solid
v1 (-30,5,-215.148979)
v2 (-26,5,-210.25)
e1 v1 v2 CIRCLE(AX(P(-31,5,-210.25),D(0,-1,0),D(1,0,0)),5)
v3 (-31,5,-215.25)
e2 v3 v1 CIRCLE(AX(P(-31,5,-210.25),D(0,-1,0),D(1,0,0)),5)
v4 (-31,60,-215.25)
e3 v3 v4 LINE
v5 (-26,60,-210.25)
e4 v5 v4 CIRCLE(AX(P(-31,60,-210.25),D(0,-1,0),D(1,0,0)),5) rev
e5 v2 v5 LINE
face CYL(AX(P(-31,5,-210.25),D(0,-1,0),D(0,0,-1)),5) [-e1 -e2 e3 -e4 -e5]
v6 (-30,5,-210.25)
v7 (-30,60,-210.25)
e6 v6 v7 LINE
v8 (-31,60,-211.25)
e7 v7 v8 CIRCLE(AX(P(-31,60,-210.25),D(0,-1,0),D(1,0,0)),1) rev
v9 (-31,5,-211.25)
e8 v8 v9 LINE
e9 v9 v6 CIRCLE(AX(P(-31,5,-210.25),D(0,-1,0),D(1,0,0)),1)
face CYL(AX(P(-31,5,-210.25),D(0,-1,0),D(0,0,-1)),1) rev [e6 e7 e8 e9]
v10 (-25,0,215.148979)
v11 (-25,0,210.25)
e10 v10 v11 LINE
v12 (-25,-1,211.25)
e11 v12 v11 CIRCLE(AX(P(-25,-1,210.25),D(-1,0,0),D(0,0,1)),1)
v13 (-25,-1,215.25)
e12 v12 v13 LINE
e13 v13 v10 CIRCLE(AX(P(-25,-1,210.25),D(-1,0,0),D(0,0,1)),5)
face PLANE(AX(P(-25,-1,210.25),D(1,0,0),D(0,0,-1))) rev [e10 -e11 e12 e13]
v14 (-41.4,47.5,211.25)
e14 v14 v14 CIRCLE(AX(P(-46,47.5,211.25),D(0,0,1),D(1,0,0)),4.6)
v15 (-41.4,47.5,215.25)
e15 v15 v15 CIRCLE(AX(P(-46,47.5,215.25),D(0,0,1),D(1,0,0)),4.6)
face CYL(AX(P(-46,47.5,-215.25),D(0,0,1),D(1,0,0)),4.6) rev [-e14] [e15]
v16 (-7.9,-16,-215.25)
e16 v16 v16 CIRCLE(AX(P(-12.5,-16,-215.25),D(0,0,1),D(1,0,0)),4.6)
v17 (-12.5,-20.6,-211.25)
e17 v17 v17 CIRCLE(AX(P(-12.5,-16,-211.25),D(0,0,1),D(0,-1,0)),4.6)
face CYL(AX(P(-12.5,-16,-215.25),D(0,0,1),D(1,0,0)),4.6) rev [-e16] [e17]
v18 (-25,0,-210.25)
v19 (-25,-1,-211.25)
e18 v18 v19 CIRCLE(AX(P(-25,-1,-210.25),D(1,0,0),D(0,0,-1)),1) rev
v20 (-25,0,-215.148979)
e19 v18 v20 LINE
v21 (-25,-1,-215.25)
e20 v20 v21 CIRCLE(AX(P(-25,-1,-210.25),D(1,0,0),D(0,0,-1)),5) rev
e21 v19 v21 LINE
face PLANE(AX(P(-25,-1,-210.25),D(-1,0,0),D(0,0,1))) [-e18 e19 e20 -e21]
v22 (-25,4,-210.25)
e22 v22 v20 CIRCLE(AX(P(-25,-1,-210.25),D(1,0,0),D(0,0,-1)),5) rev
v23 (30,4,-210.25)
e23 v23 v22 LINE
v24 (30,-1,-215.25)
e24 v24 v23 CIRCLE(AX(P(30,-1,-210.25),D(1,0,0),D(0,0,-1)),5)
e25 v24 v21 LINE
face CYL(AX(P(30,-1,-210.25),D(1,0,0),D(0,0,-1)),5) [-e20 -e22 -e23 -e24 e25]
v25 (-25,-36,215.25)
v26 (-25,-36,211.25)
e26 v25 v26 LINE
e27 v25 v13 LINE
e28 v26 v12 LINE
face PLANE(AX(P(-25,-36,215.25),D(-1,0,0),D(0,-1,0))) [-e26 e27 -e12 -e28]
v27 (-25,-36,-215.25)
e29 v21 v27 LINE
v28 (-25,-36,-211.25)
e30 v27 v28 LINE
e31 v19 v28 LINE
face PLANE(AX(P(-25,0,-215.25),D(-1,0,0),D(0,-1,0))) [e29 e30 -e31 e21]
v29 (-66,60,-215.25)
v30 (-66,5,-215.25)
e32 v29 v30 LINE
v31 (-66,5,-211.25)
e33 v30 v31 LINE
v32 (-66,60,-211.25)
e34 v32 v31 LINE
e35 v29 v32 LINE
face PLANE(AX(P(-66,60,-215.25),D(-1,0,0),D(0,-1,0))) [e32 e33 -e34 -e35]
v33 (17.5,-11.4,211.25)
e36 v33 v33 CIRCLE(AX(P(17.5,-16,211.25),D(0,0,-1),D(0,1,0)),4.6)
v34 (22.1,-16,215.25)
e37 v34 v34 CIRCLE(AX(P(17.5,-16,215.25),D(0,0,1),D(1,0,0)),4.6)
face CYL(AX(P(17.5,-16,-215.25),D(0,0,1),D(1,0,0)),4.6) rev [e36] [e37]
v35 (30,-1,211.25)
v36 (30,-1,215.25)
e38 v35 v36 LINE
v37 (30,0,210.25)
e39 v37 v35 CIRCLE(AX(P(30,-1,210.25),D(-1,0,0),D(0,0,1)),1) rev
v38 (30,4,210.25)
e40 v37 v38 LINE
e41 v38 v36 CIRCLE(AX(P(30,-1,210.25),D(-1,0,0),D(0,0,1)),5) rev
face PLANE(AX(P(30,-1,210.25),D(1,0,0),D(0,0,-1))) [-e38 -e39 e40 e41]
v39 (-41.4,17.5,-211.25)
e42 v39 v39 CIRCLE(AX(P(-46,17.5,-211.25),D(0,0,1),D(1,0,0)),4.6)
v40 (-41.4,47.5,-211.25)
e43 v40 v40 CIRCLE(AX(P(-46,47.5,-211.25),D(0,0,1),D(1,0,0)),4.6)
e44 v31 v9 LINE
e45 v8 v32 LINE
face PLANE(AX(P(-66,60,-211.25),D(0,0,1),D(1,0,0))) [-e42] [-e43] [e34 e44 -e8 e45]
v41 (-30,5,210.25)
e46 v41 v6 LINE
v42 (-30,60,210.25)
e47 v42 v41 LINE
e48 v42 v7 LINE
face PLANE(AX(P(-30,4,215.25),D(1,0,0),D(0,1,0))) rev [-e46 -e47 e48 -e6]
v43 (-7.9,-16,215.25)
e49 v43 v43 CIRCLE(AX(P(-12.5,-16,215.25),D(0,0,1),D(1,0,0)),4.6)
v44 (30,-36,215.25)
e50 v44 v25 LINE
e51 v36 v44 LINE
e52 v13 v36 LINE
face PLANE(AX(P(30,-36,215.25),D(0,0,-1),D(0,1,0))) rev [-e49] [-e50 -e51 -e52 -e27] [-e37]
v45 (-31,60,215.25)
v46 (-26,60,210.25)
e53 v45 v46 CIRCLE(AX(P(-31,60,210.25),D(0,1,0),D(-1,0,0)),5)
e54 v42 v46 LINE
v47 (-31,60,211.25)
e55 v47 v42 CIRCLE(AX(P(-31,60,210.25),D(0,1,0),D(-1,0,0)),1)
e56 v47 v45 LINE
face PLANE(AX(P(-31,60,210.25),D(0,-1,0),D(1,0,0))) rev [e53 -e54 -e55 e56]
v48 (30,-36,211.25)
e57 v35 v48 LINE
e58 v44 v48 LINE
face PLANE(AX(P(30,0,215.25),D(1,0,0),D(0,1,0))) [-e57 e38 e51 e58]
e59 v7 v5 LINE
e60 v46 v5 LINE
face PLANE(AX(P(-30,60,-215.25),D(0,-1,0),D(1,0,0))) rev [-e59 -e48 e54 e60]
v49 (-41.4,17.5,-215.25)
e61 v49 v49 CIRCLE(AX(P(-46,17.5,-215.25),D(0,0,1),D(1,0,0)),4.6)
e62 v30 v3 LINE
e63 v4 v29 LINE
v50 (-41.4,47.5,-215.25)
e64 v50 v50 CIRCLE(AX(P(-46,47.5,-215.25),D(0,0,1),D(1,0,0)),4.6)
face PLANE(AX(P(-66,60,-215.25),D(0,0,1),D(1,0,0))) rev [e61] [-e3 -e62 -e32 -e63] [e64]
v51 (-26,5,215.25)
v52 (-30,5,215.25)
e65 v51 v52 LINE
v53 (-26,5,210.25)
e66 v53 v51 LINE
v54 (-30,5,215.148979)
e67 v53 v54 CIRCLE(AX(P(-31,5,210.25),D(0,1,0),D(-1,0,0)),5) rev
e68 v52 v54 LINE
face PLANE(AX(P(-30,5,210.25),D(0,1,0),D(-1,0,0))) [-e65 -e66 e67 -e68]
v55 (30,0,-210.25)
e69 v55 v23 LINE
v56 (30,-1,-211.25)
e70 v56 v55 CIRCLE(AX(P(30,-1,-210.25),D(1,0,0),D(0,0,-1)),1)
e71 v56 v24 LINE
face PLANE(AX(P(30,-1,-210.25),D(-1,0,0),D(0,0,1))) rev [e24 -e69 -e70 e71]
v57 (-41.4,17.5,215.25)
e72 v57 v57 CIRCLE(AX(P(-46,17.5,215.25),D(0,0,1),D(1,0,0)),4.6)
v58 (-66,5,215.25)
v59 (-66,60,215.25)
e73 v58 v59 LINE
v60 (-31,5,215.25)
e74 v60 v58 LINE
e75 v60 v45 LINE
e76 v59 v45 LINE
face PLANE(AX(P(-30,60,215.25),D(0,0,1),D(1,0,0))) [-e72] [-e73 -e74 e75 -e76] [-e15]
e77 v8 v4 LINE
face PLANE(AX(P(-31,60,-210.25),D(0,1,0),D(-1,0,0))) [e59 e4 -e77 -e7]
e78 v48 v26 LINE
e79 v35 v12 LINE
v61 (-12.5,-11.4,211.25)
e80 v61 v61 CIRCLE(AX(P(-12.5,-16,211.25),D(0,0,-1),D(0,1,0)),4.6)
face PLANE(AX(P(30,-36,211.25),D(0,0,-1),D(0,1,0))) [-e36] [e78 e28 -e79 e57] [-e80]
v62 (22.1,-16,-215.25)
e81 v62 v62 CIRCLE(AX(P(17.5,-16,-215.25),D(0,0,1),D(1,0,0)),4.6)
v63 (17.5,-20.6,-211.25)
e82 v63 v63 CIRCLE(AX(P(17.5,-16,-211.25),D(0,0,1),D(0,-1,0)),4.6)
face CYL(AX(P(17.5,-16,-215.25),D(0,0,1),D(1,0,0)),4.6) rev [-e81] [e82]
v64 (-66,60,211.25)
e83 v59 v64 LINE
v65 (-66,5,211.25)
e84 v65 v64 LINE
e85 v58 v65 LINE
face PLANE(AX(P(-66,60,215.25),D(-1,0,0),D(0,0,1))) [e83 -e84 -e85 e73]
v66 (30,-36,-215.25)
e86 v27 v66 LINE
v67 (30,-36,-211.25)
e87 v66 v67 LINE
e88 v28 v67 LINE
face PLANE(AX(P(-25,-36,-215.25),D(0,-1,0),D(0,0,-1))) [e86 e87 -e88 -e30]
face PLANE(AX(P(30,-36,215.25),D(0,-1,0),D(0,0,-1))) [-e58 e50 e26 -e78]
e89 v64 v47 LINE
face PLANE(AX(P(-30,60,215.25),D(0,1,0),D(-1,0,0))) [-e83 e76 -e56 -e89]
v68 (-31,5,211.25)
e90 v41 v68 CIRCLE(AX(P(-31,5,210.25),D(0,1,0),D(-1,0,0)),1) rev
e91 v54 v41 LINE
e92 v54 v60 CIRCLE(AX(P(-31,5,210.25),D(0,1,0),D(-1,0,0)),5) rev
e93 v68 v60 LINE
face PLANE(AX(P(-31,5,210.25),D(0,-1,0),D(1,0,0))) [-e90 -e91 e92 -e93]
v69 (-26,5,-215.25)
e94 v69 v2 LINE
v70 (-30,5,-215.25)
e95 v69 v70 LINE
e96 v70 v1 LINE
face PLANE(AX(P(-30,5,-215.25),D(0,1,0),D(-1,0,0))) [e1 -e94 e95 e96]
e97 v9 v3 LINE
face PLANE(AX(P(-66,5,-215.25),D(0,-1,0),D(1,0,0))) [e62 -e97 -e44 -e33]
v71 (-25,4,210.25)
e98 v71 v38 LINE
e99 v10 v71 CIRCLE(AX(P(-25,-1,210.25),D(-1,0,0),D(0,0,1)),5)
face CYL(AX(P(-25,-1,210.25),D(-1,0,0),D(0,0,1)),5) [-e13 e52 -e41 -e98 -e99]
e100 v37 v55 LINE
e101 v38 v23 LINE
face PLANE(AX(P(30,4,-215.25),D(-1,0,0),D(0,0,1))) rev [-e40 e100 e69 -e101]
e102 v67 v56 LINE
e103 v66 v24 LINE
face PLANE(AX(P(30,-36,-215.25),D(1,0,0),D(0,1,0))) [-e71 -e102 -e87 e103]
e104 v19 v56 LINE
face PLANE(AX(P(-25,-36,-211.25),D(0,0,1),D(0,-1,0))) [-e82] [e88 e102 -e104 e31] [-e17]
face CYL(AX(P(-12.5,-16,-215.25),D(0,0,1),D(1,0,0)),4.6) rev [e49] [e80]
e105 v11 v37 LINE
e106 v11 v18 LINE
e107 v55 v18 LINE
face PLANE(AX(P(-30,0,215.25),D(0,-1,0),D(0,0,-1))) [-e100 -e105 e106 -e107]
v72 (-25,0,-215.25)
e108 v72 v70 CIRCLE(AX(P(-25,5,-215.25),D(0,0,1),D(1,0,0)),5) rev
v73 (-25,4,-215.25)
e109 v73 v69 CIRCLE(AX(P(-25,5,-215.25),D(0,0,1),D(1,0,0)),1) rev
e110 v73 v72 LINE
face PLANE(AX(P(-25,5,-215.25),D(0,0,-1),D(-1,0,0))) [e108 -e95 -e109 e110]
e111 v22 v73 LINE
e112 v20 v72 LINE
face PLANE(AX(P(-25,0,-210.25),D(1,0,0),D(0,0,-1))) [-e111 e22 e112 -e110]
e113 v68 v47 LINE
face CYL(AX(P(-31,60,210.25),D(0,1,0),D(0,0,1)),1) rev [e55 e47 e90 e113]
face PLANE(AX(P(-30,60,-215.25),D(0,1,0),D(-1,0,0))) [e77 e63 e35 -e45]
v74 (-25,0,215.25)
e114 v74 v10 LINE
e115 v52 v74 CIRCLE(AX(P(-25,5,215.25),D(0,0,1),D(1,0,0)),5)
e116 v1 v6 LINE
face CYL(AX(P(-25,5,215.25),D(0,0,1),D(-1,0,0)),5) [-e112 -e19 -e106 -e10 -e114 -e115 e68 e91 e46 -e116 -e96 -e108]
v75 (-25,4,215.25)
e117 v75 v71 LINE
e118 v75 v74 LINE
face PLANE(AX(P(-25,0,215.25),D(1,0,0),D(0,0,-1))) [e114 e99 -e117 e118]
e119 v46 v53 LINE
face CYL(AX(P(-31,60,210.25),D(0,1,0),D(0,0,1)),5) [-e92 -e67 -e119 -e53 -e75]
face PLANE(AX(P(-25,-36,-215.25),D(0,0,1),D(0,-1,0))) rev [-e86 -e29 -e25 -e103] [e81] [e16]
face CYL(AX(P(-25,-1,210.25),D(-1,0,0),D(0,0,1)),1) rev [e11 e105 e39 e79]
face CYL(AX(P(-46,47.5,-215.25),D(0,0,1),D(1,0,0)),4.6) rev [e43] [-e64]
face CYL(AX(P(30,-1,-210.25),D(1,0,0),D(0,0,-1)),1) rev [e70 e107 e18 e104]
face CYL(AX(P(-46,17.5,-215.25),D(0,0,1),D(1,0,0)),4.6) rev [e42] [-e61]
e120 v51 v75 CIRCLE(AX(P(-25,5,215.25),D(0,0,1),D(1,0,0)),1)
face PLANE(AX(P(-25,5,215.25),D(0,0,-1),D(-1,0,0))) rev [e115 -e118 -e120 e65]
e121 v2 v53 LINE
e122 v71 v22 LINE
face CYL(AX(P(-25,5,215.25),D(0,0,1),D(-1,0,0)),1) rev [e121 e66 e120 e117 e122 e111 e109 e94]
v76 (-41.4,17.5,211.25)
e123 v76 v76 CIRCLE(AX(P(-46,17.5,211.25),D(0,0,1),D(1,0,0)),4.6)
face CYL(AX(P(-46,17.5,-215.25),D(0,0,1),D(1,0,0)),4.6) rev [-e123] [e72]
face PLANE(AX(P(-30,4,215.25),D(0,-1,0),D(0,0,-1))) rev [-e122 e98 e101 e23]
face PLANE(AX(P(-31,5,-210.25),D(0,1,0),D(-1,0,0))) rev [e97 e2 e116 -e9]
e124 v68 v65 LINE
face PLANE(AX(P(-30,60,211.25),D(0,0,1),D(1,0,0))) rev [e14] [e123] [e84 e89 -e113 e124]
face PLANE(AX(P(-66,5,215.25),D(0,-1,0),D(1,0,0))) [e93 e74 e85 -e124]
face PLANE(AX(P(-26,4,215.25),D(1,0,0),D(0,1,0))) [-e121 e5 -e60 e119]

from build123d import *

# Parameters (mm, degrees)
SKETCH1_W                      = 60
SKETCH1_H                      = 430.5
BASE_FLANGE1_DEPTH             = 4
EDGE_FLANGE1_STRIP_W           = 18
EDGE_FLANGE1_STRIP_H           = 4
EDGE_FLANGE1_STRIP_CUT_DEPTH   = 430.5
EDGE_FLANGE1_DEPTH             = 430.5
EDGE_FLANGE2_STRIP_W           = 18
EDGE_FLANGE2_STRIP_H           = 4
EDGE_FLANGE2_STRIP_CUT_DEPTH   = 55
EDGE_FLANGE2_STRIP_2_W         = 18
EDGE_FLANGE2_STRIP_2_H         = 4
EDGE_FLANGE2_STRIP_CUT_2_DEPTH = 55
EDGE_FLANGE2_STRIP_3_W         = 18
EDGE_FLANGE2_STRIP_3_H         = 4
EDGE_FLANGE2_STRIP_CUT_3_DEPTH = 55
EDGE_FLANGE2_STRIP_4_W         = 18
EDGE_FLANGE2_STRIP_4_H         = 4
EDGE_FLANGE2_STRIP_CUT_4_DEPTH = 55
EDGE_FLANGE2_DEPTH             = 55
EDGE_FLANGE2_BEND_DEPTH        = 55
EDGE_FLANGE2_BEND_2_DEPTH      = 55
EDGE_FLANGE2_BEND_3_DEPTH      = 55
SKETCH18_R                     = 4.6
EXTRUDE1_DEPTH                 = 440.643321341


# Sheet-metal steps are written as plain solids
with BuildPart() as part:
    # Sketch1 → Base-Flange1 (new body)
    with BuildSketch(Plane(origin=(0, 0, 0), x_dir=(1, 0, 0), z_dir=(0, 1, 0))):
        Rectangle(SKETCH1_W, SKETCH1_H)
    extrude(amount=BASE_FLANGE1_DEPTH)

    # Edge-Flange1 strip (across the edge) → Edge-Flange1 strip cut (cut)
    with BuildSketch(Plane(origin=(-30, 4, -215.25), x_dir=(1, 0, 0), z_dir=(0, 0, 1))):
        with Locations((-4, -2)):
            Rectangle(EDGE_FLANGE1_STRIP_W, EDGE_FLANGE1_STRIP_H)
    extrude(amount=EDGE_FLANGE1_STRIP_CUT_DEPTH, mode=Mode.SUBTRACT)

    # Edge-Flange1 section (across the edge) → Edge-Flange1 (add)
    with BuildSketch(Plane(origin=(-30, 4, -215.25), x_dir=(1, 0, 0), z_dir=(0, 0, 1))):
        with BuildLine():
            Line((0, 1), (0, 56))
            Line((0, 56), (4, 56))
            Line((4, 56), (4, 1))
            ThreePointArc((4, 1), (4.292893219, 0.292893219), (5, 0))
            Line((5, 0), (5, -4))
            ThreePointArc((5, -4), (1.464466094, -2.535533906), (0, 1))
        make_face()
    extrude(amount=EDGE_FLANGE1_DEPTH)

    # Edge-Flange2 strip (across the edge) → Edge-Flange2 strip cut (cut)
    with BuildSketch(Plane(origin=(-30, 5, 215.25), x_dir=(0, 0, -1), z_dir=(0, 1, 0))):
        with Locations((-4, -2)):
            Rectangle(EDGE_FLANGE2_STRIP_W, EDGE_FLANGE2_STRIP_H)
    extrude(amount=EDGE_FLANGE2_STRIP_CUT_DEPTH, mode=Mode.SUBTRACT)

    # Edge-Flange2 strip 2 (across the edge) → Edge-Flange2 strip cut 2 (cut)
    with BuildSketch(Plane(origin=(30, 0, 215.25), x_dir=(0, 0, -1), z_dir=(-1, 0, 0))):
        with Locations((-4, -2)):
            Rectangle(EDGE_FLANGE2_STRIP_2_W, EDGE_FLANGE2_STRIP_2_H)
    extrude(amount=EDGE_FLANGE2_STRIP_CUT_2_DEPTH, mode=Mode.SUBTRACT)

    # Edge-Flange2 strip 3 (across the edge) → Edge-Flange2 strip cut 3 (cut)
    with BuildSketch(Plane(origin=(-30, 60, -215.25), x_dir=(0, 0, 1), z_dir=(0, -1, 0))):
        with Locations((-4, -2)):
            Rectangle(EDGE_FLANGE2_STRIP_3_W, EDGE_FLANGE2_STRIP_3_H)
    extrude(amount=EDGE_FLANGE2_STRIP_CUT_3_DEPTH, mode=Mode.SUBTRACT)

    # Edge-Flange2 strip 4 (across the edge) → Edge-Flange2 strip cut 4 (cut)
    with BuildSketch(Plane(origin=(-25, 0, -215.25), x_dir=(0, 0, 1), z_dir=(1, 0, 0))):
        with Locations((-4, -2)):
            Rectangle(EDGE_FLANGE2_STRIP_4_W, EDGE_FLANGE2_STRIP_4_H)
    extrude(amount=EDGE_FLANGE2_STRIP_CUT_4_DEPTH, mode=Mode.SUBTRACT)

    # Edge-Flange2 section (across the edge) → Edge-Flange2 (add)
    with BuildSketch(Plane(origin=(-30, 5, 215.25), x_dir=(0, 0, -1), z_dir=(0, 1, 0))):
        with BuildLine():
            Line((0, 1), (0, 36))
            Line((0, 36), (4, 36))
            Line((4, 36), (4, 1))
            ThreePointArc((4, 1), (4.292893219, 0.292893219), (5, 0))
            Line((5, 0), (5, -4))
            ThreePointArc((5, -4), (1.464466094, -2.535533906), (0, 1))
        make_face()
    extrude(amount=EDGE_FLANGE2_DEPTH)

    # Edge-Flange2 section 2 (across the edge) → Edge-Flange2 bend (add)
    with BuildSketch(Plane(origin=(30, 0, 215.25), x_dir=(0, 0, -1), z_dir=(-1, 0, 0))):
        with BuildLine():
            Line((0, 1), (0, 36))
            Line((0, 36), (4, 36))
            Line((4, 36), (4, 1))
            ThreePointArc((4, 1), (4.292893219, 0.292893219), (5, 0))
            Line((5, 0), (5, -4))
            ThreePointArc((5, -4), (1.464466094, -2.535533906), (0, 1))
        make_face()
    extrude(amount=EDGE_FLANGE2_BEND_DEPTH)

    # Edge-Flange2 section 3 (across the edge) → Edge-Flange2 bend 2 (add)
    with BuildSketch(Plane(origin=(-30, 60, -215.25), x_dir=(0, 0, 1), z_dir=(0, -1, 0))):
        with BuildLine():
            Line((0, 1), (0, 36))
            Line((0, 36), (4, 36))
            Line((4, 36), (4, 1))
            ThreePointArc((4, 1), (4.292893219, 0.292893219), (5, 0))
            Line((5, 0), (5, -4))
            ThreePointArc((5, -4), (1.464466094, -2.535533906), (0, 1))
        make_face()
    extrude(amount=EDGE_FLANGE2_BEND_2_DEPTH)

    # Edge-Flange2 section 4 (across the edge) → Edge-Flange2 bend 3 (add)
    with BuildSketch(Plane(origin=(-25, 0, -215.25), x_dir=(0, 0, 1), z_dir=(1, 0, 0))):
        with BuildLine():
            Line((0, 1), (0, 36))
            Line((0, 36), (4, 36))
            Line((4, 36), (4, 1))
            ThreePointArc((4, 1), (4.292893219, 0.292893219), (5, 0))
            Line((5, 0), (5, -4))
            ThreePointArc((5, -4), (1.464466094, -2.535533906), (0, 1))
        make_face()
    extrude(amount=EDGE_FLANGE2_BEND_3_DEPTH)

    # Sketch18 → Extrude1 (cut, through all)
    with BuildSketch(Plane.XY.offset(215.25)):
        with Locations((-46, 47.5)):
            Circle(SKETCH18_R)
        with Locations((-46, 17.5)):
            Circle(SKETCH18_R)
        with Locations((-12.5, -16)):
            Circle(SKETCH18_R)
        with Locations((17.5, -16)):
            Circle(SKETCH18_R)
    extrude(amount=-EXTRUDE1_DEPTH, mode=Mode.SUBTRACT)


solid = part.part
